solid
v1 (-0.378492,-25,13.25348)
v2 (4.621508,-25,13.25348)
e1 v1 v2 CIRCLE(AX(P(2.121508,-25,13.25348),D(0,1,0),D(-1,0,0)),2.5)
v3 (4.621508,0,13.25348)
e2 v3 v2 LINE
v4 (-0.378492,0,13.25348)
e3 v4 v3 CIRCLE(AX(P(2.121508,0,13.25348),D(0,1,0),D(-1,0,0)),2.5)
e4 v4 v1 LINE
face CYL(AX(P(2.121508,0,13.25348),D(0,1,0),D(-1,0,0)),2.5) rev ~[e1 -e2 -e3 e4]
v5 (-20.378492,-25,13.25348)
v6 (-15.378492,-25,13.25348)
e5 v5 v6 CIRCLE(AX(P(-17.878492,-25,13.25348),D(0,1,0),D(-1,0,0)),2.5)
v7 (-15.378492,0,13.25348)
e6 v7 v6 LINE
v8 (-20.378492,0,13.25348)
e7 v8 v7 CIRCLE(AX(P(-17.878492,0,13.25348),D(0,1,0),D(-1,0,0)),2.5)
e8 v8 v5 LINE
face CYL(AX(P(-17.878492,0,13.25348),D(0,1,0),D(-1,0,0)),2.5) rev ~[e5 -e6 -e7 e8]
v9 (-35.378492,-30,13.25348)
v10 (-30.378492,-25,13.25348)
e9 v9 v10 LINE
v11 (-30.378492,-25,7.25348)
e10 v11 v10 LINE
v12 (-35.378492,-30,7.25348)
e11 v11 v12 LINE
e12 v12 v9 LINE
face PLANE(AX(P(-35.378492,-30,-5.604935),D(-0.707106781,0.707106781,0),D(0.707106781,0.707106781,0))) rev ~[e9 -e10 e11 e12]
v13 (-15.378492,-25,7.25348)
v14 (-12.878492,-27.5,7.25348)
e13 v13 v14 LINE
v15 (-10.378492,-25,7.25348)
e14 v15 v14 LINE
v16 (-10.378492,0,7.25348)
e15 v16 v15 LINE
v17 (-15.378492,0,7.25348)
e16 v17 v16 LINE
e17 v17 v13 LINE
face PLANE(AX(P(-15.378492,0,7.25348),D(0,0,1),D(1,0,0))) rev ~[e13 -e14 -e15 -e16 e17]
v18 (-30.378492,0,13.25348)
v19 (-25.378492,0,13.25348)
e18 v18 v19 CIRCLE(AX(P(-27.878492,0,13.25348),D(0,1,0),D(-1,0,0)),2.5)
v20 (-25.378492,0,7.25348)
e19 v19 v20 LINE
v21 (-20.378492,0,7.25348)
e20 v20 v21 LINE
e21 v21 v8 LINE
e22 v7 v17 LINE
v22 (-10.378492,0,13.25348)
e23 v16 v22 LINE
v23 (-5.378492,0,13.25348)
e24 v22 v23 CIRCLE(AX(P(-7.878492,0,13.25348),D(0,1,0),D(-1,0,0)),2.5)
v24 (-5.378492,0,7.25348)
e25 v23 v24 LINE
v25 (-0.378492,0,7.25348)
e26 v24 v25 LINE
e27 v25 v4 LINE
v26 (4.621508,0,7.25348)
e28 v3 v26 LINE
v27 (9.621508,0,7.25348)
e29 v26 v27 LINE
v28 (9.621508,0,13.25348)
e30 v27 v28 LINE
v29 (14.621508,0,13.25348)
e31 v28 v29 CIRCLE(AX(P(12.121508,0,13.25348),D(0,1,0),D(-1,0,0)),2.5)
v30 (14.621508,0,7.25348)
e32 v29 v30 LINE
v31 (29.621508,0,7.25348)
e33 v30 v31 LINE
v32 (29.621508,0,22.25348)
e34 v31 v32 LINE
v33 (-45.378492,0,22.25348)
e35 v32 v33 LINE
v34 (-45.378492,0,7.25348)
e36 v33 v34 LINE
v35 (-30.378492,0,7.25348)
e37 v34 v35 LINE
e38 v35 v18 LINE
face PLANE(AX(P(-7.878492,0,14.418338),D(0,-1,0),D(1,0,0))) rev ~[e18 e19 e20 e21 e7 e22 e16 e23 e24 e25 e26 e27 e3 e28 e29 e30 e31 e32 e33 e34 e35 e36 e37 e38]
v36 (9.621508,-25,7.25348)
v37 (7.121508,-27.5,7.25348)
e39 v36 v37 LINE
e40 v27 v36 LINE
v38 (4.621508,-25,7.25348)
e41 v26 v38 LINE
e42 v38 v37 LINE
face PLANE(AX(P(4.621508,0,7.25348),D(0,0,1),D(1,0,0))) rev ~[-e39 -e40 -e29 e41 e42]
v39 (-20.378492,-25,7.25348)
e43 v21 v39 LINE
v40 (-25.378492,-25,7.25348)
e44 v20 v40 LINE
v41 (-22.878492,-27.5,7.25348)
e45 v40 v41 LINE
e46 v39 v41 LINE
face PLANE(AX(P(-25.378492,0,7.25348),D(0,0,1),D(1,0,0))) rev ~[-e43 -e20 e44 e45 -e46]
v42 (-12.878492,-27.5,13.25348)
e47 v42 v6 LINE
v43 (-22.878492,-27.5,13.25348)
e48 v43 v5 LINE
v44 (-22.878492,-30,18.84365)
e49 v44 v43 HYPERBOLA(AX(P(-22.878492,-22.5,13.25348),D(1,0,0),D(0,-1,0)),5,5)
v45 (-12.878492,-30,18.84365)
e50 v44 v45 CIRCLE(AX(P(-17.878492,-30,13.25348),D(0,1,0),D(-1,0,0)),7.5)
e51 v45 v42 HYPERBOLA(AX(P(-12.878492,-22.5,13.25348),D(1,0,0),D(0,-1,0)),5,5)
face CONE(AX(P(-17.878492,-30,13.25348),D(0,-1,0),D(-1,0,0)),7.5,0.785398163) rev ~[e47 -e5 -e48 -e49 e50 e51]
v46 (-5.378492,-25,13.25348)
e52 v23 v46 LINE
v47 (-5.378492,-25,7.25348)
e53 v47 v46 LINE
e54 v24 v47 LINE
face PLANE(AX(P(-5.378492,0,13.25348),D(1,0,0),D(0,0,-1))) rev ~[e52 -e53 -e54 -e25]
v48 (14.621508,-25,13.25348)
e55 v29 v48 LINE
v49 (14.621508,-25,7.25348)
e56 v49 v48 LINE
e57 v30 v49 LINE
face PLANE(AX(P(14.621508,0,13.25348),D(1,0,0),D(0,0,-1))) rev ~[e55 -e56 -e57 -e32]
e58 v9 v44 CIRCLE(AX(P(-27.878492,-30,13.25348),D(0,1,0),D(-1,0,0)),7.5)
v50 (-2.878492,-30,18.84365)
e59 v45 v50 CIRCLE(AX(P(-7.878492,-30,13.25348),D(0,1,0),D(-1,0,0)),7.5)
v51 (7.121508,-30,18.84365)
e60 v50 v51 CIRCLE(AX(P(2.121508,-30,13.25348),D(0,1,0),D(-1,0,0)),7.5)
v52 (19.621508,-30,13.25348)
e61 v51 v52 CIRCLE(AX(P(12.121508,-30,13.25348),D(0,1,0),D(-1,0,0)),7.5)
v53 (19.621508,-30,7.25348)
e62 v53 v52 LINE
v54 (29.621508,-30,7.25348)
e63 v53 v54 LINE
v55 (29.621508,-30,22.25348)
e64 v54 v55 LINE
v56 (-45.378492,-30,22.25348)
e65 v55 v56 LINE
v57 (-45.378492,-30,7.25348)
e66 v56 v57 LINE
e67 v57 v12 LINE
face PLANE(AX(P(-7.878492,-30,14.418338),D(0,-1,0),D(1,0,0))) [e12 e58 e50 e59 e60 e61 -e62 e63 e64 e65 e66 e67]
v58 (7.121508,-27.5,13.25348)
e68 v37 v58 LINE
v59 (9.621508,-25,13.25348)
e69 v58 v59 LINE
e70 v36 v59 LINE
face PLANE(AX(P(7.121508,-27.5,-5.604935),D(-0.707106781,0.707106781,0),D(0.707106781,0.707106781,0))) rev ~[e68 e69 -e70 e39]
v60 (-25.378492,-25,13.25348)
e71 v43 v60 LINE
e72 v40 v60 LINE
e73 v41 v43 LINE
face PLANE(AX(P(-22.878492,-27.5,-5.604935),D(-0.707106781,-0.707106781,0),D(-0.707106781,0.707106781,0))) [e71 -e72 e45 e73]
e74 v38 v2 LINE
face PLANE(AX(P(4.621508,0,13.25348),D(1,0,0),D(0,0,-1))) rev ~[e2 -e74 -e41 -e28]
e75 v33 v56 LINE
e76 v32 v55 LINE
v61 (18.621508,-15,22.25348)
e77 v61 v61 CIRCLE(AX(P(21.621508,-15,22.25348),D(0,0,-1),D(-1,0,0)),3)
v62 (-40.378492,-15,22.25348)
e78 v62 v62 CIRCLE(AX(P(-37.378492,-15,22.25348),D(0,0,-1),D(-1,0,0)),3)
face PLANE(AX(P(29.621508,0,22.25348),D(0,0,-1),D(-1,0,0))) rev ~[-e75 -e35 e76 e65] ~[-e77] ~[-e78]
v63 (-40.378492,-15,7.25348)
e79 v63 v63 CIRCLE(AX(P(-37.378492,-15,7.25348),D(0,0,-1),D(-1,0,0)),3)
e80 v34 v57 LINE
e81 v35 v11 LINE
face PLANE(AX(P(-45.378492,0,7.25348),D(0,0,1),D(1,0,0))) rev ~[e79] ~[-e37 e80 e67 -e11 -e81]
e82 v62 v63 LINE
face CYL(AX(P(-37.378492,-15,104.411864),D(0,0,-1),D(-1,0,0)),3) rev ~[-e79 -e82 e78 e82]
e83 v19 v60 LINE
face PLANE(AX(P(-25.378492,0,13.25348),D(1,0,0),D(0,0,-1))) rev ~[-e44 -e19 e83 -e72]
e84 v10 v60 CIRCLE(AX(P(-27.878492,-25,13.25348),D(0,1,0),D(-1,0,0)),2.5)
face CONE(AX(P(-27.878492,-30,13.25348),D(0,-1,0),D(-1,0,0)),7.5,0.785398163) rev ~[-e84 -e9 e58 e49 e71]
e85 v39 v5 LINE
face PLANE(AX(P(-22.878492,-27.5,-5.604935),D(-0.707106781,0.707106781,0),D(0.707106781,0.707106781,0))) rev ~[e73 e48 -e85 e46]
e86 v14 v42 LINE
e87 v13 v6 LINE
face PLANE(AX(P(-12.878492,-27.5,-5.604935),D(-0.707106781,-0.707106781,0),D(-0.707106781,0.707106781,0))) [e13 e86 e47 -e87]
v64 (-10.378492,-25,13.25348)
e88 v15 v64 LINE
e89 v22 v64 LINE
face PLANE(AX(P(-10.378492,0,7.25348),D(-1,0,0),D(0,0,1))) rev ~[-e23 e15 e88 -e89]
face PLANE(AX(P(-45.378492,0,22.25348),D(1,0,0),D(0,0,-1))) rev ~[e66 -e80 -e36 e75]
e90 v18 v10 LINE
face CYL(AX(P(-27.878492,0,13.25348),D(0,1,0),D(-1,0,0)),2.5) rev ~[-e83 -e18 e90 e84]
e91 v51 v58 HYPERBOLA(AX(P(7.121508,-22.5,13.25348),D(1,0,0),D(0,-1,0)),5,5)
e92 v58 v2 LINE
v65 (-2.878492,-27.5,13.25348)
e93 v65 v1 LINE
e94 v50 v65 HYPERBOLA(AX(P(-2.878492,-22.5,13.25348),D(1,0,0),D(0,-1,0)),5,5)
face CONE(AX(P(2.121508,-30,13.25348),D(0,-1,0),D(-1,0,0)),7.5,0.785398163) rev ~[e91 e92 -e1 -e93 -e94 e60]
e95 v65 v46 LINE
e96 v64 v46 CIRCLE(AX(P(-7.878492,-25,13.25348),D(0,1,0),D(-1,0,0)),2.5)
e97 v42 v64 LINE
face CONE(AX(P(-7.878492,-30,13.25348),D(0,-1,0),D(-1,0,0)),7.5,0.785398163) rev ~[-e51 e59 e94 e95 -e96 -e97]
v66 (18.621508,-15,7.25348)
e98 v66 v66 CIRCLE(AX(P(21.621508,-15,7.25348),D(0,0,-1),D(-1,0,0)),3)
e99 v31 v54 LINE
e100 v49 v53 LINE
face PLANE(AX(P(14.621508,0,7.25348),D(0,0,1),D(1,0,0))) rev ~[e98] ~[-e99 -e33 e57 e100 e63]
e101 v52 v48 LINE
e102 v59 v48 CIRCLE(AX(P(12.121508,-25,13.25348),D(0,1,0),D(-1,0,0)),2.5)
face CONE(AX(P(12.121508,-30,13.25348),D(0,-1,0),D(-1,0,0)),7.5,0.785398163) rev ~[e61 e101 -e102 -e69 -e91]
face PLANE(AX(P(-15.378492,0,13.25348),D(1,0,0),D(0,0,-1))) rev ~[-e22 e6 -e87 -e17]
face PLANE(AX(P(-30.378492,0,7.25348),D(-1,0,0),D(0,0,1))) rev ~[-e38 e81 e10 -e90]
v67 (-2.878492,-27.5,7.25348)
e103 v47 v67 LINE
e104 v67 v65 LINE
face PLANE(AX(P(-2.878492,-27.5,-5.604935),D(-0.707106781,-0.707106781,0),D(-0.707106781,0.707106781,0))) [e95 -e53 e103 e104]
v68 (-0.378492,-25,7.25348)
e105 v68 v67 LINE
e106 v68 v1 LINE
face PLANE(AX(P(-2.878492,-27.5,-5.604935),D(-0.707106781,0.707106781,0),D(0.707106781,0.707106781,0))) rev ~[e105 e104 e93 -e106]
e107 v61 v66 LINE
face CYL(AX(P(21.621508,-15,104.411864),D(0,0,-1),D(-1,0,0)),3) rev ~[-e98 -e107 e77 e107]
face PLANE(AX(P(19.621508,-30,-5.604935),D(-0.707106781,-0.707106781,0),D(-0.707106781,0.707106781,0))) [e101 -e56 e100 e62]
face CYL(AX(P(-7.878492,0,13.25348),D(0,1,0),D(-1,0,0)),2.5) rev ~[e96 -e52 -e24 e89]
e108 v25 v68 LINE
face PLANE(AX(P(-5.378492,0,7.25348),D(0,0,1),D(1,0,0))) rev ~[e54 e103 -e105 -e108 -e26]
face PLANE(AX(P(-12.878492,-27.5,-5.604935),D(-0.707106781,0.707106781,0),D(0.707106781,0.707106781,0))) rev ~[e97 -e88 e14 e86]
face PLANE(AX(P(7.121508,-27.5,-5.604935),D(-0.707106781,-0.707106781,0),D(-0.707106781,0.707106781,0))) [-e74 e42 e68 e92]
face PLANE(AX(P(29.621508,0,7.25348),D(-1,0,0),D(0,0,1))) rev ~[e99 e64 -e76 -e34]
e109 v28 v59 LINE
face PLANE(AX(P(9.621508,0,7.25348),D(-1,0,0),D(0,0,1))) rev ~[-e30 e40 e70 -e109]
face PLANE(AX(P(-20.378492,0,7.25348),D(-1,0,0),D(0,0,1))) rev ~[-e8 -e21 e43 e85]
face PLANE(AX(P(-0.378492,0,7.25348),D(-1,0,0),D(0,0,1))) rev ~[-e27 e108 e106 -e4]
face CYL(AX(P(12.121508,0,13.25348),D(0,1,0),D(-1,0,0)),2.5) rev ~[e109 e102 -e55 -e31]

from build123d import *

# Parameters (mm, degrees)
F1_DEPTH     = 30
F3_D         = 6
F4_T1_DEPTH  = 18.8584149398
F4_T4_ANGLE  = 180
F4_T6_ANGLE  = 180
F4_T8_ANGLE  = 180
F4_T10_ANGLE = 180
F4_T12_ANGLE = 180


# Not quite as in the source:
# - a fillet or chamfer that OpenCascade refuses, or shapes differently, is made with other operations: its cross-section is extruded or revolved along the edge and cut away or added


with BuildPart() as f1:
    # F0 (on Front) → F1 (new body)
    with BuildSketch(Plane.XZ):
        with BuildLine():
            Line((29.6215080619, 22.2534802178), (-45.3784919381, 22.2534802178))
            Line((-45.3784919381, 22.2534802178), (-45.3784919381, 7.2534802178))
            Line((-45.3784919381, 7.2534802178), (-30.3784919381, 7.2534802178))
            Line((-30.3784919381, 7.2534802178), (-30.3784919381, 13.2534802178))
            ThreePointArc((-30.3784919381, 13.2534802178), (-27.8784919381, 15.7534802178), (-25.3784919381, 13.2534802178))
            Line((-25.3784919381, 13.2534802178), (-25.3784919381, 7.2534802178))
            Line((-25.3784919381, 7.2534802178), (-20.3784919381, 7.2534802178))
            Line((-20.3784919381, 7.2534802178), (-20.3784919381, 13.2534802178))
            ThreePointArc((-20.3784919381, 13.2534802178), (-17.8784919381, 15.7534802178), (-15.3784919381, 13.2534802178))
            Line((-15.3784919381, 13.2534802178), (-15.3784919381, 7.2534802178))
            Line((-15.3784919381, 7.2534802178), (-10.3784919381, 7.2534802178))
            Line((-10.3784919381, 7.2534802178), (-10.3784919381, 13.2534802178))
            ThreePointArc((-10.3784919381, 13.2534802178), (-7.8784919381, 15.7534802178), (-5.3784919381, 13.2534802178))
            Line((-5.3784919381, 13.2534802178), (-5.3784919381, 7.2534802178))
            Line((-5.3784919381, 7.2534802178), (-0.3784919381, 7.2534802178))
            Line((-0.3784919381, 7.2534802178), (-0.3784919381, 13.2534802178))
            ThreePointArc((-0.3784919381, 13.2534802178), (2.1215080619, 15.7534802178), (4.6215080619, 13.2534802178))
            Line((4.6215080619, 13.2534802178), (4.6215080619, 7.2534802178))
            Line((4.6215080619, 7.2534802178), (9.6215080619, 7.2534802178))
            Line((9.6215080619, 7.2534802178), (9.6215080619, 13.2534802178))
            ThreePointArc((9.6215080619, 13.2534802178), (12.1215080619, 15.7534802178), (14.6215080619, 13.2534802178))
            Line((14.6215080619, 13.2534802178), (14.6215080619, 7.2534802178))
            Line((14.6215080619, 7.2534802178), (29.6215080619, 7.2534802178))
            Line((29.6215080619, 7.2534802178), (29.6215080619, 22.2534802178))
        make_face()
    extrude(amount=F1_DEPTH)

    # F3 (through all)
    with Locations(Plane.XY.offset(22.2534802178)):
        with Locations((-37.3784919381, -15), (21.6215080619, -15)):
            Hole(F3_D / 2)

    # F4: chamfer of 5 on 5 edges, made by hand

    # F4_s2 → F4_t1 (cut)
    with BuildSketch(Plane.XY.offset(-5.604934722)):
        Polygon((-35.3784919381, -30), (-30.3784919381, -25), (-30.3784919381, -30), align=None)
        Polygon((-25.3784919381, -30), (-20.3784919381, -25), (-20.3784919381, -30), align=None)
        Polygon((-15.3784919381, -30), (-10.3784919381, -25), (-10.3784919381, -30), align=None)
        Polygon((-5.3784919381, -30), (-0.3784919381, -25), (-0.3784919381, -30), align=None)
        Polygon((4.6215080619, -30), (9.6215080619, -25), (9.6215080619, -30), align=None)
        Polygon((19.6215080619, -30), (14.6215080619, -25), (14.6215080619, -30), align=None)
        Polygon((9.6215080619, -30), (4.6215080619, -25), (4.6215080619, -30), align=None)
        Polygon((-0.3784919381, -30), (-5.3784919381, -25), (-5.3784919381, -30), align=None)
        Polygon((-10.3784919381, -30), (-15.3784919381, -25), (-15.3784919381, -30), align=None)
        Polygon((-20.3784919381, -30), (-25.3784919381, -25), (-25.3784919381, -30), align=None)
    extrude(amount=F4_T1_DEPTH, mode=Mode.SUBTRACT)

    # F4_s3 → F4_t4 (revolve, cut)
    with BuildSketch(Plane.XY.offset(13.2534802178)):
        Polygon((4.6215080619, -30), (9.6215080619, -25), (9.6215080619, -30), align=None)
    revolve(axis=Axis((12.1215080619, -30, 13.2534802178), (0, 1, 0)), revolution_arc=F4_T4_ANGLE, mode=Mode.SUBTRACT)

    # F4_s5 → F4_t6 (revolve, cut)
    with BuildSketch(Plane.XY.offset(13.2534802178)):
        Polygon((-5.3784919381, -30), (-0.3784919381, -25), (-0.3784919381, -30), align=None)
    revolve(axis=Axis((2.1215080619, -30, 13.2534802178), (0, 1, 0)), revolution_arc=F4_T6_ANGLE, mode=Mode.SUBTRACT)

    # F4_s7 → F4_t8 (revolve, cut)
    with BuildSketch(Plane.XY.offset(13.2534802178)):
        Polygon((-15.3784919381, -30), (-10.3784919381, -25), (-10.3784919381, -30), align=None)
    revolve(axis=Axis((-7.8784919381, -30, 13.2534802178), (0, 1, 0)), revolution_arc=F4_T8_ANGLE, mode=Mode.SUBTRACT)

    # F4_s9 → F4_t10 (revolve, cut)
    with BuildSketch(Plane.XY.offset(13.2534802178)):
        Polygon((-25.3784919381, -30), (-20.3784919381, -25), (-20.3784919381, -30), align=None)
    revolve(axis=Axis((-17.8784919381, -30, 13.2534802178), (0, 1, 0)), revolution_arc=F4_T10_ANGLE, mode=Mode.SUBTRACT)

    # F4_s11 → F4_t12 (revolve, cut)
    with BuildSketch(Plane.XY.offset(13.2534802178)):
        Polygon((-35.3784919381, -30), (-30.3784919381, -25), (-30.3784919381, -30), align=None)
    revolve(axis=Axis((-27.8784919381, -30, 13.2534802178), (0, 1, 0)), revolution_arc=F4_T12_ANGLE, mode=Mode.SUBTRACT)


solid = f1.part
